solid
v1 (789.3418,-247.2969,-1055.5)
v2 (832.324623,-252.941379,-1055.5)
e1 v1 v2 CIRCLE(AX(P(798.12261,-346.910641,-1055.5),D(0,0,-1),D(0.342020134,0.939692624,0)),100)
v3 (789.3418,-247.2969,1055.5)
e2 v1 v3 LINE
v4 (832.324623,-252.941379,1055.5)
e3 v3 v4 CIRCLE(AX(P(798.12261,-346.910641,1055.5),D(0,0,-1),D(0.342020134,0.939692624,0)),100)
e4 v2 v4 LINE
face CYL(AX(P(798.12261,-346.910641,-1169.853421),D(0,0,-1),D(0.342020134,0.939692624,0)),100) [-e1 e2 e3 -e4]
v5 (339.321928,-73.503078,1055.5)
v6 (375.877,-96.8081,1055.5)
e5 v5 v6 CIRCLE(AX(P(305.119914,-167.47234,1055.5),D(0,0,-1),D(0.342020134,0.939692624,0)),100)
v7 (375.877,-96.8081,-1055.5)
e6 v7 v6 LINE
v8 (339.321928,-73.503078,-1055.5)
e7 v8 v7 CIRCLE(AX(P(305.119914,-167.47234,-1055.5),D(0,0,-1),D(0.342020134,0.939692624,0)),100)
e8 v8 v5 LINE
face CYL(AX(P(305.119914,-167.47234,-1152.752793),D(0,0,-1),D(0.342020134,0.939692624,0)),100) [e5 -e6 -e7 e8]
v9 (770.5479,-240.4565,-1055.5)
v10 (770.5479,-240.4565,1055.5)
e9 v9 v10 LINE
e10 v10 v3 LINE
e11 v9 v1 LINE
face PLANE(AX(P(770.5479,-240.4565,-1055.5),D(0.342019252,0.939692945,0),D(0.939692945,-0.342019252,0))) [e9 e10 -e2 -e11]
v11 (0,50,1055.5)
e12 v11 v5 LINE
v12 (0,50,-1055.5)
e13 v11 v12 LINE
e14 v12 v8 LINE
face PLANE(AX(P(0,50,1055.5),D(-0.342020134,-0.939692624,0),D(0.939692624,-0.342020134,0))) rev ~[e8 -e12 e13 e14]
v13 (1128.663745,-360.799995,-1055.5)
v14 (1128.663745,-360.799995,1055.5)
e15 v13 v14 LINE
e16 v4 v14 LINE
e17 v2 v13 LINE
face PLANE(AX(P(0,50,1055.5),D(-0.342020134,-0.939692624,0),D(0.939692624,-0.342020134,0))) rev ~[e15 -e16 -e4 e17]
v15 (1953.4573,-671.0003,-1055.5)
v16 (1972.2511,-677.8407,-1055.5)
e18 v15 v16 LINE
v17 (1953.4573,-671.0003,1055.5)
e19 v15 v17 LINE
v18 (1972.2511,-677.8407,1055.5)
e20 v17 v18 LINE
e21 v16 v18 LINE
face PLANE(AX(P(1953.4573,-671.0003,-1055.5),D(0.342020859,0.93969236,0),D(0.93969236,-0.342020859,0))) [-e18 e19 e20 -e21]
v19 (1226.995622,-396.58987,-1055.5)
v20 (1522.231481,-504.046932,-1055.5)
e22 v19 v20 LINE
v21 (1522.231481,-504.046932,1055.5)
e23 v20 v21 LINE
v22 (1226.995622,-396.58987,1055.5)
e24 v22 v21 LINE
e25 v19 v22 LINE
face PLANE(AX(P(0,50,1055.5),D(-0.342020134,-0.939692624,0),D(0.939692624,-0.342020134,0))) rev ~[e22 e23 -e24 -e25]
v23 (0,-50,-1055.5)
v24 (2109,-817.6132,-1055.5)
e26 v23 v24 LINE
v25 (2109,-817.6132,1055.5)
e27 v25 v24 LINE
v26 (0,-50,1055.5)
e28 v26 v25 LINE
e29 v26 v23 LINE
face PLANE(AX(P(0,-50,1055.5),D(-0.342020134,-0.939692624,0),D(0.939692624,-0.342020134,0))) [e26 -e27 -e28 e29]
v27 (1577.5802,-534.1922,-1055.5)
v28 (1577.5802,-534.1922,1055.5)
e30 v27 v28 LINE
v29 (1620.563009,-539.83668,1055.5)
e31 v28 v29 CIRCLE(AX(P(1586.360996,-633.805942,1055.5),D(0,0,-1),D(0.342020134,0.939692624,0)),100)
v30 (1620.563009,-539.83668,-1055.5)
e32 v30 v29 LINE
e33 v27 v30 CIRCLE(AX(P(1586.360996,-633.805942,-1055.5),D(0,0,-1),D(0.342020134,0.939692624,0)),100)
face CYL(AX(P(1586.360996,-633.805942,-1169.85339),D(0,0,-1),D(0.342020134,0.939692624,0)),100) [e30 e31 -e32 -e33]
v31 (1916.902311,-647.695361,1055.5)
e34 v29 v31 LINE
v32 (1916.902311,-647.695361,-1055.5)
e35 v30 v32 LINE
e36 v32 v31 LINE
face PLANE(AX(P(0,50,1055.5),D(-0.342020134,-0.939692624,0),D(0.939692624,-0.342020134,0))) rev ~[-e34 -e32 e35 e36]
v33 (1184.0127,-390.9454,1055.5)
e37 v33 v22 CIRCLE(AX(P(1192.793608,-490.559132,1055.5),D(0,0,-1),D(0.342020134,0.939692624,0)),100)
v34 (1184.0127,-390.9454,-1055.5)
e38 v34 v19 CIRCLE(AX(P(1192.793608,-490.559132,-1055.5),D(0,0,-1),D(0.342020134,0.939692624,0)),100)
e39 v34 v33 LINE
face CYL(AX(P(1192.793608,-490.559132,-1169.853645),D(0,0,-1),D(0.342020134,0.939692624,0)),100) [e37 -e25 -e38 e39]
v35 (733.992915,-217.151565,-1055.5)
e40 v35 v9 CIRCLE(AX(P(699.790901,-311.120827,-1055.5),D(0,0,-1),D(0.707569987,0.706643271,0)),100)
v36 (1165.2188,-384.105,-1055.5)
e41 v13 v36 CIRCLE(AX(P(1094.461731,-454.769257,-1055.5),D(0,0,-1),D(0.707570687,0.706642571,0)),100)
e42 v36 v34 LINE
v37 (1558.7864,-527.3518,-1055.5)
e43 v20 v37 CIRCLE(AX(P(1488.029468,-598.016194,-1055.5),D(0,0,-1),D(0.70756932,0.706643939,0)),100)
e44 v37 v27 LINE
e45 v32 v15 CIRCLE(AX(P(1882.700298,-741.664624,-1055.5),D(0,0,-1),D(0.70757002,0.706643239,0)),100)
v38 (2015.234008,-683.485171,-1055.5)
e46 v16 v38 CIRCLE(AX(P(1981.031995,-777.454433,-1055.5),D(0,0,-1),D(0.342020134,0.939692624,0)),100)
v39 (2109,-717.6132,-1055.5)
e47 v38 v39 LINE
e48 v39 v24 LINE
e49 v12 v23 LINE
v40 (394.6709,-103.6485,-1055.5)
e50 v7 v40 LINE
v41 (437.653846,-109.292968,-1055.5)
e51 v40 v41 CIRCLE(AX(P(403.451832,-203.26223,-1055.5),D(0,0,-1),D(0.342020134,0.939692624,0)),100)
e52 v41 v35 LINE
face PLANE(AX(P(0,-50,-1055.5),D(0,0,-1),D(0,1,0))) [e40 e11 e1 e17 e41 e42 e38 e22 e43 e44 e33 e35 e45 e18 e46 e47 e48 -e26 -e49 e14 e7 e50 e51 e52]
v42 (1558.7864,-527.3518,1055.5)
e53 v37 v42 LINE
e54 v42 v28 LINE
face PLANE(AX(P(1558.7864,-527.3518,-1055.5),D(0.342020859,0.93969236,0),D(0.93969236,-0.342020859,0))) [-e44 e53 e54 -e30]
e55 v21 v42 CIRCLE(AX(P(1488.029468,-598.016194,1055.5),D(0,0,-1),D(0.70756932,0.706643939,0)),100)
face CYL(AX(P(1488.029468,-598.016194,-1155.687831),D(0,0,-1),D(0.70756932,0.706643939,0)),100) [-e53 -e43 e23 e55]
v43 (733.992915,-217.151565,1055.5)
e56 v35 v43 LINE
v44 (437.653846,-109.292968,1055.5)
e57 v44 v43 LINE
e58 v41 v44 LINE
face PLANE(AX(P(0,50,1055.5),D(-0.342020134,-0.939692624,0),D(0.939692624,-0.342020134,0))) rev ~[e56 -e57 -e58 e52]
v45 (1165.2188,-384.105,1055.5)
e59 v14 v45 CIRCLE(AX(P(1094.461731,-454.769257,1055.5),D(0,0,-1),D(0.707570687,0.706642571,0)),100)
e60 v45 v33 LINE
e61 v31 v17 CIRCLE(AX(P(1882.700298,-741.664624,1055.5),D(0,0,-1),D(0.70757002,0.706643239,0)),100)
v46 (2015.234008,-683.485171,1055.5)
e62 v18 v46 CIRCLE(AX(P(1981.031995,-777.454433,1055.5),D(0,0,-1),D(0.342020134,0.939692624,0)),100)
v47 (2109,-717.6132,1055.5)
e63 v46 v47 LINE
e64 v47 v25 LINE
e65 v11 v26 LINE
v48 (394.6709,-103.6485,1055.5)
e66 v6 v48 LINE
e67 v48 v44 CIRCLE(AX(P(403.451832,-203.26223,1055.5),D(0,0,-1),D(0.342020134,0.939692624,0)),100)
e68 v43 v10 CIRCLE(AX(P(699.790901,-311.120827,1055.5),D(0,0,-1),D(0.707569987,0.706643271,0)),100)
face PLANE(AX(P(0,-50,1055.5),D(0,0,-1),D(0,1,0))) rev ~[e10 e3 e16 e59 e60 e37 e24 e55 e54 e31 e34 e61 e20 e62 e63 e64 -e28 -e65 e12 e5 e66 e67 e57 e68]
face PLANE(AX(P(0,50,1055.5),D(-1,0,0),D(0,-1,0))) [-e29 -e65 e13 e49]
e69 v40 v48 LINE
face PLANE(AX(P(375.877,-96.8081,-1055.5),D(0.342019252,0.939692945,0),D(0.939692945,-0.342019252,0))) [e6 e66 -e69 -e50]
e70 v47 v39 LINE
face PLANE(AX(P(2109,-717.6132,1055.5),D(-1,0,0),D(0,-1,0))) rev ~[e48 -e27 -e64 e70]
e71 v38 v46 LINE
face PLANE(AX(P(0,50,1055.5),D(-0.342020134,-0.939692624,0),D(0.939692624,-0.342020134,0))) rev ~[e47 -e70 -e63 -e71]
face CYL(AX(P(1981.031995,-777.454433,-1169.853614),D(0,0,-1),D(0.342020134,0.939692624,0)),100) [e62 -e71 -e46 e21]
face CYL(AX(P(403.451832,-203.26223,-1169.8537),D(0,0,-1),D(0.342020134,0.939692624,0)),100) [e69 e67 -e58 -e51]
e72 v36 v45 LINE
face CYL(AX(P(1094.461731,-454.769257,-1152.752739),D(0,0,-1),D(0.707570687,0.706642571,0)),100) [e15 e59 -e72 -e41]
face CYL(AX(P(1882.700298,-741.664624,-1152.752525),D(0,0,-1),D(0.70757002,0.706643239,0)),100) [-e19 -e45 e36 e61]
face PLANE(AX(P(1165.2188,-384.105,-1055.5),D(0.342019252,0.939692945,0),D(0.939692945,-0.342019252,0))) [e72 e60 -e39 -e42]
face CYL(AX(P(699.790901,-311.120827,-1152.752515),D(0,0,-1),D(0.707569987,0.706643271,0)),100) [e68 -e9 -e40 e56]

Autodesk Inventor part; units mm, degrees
ref_plane "XZ Plane" through (0, 0, 0) normal (0, 1, 0) x (-1, 0, 0)
sketch "Sketch1" plane through (0, 0, 0) normal (1, 0, 0) x (0, 1, 0)
  line L0 (-50, 1055.5) -> (50, 1055.5)
  line L1 (50, 1055.5) -> (50, -1055.5)
  line L2 (50, -1055.5) -> (-50, -1055.5)
  line L3 (-50, -1055.5) -> (-50, 1055.5)
  line L4 (-50, 1055.5) -> (50, -1055.5) construction
  line L5 (50, 1055.5) -> (-50, -1055.5) construction
  point P0 (0, 0)
  dimension "d0" = 100
  dimension "d1" = 2111
ref_plane "Work Plane2" through (2109, 0, 0) normal (1, 0, 0) x (0, 1, 0)
ref_plane "Work Plane1" through (0, 0, 0) normal (1, 0, 0) x (0, 1, 0)
sketch "Sketch3" plane through (2109, 0, 0) normal (1, 0, 0) x (0, 1, 0)
  line L0 (-50, 1055.5) -> (50, 1055.5) projected
  point P0 (0, 0)
ref_plane "Work Plane3" through (0, -50, 1055.5) normal (0, 0, -1) x (0, 1, 0)
sketch "Sketch4" plane through (0, -50, 1055.5) normal (0, 0, -1) x (0, 1, 0)
  line L0 (0, 2109) -> (100, 2109) projected
  line L1 (100, 0) -> (-667.6132, 2109)
  line L2 (100, 0) -> (2344.3509, 0) construction
  line L3 (0, 0) -> (-767.6132, 2109)
  line L4 (0, 0) -> (2244.3509, 0) construction
  line L5 (-667.6132, 2109) -> (-767.6132, 2109)
  line L6 (100, 0) -> (0, 0)
  point P0 (50, 0)
  dimension "d4" = 110
  dimension "d5" = 110
extrude "Extrusion1" add sketch "Sketch4" along normal blind 2111
sketch "Sketch5" plane through (0, -50, -1055.5) normal (0, 0, -1) x (-1, 0, 0)
  line L0 (0, 100) -> (-2109, -667.6132) projected
  line L1 (0, 100) -> (-375.877, -36.8081)
  line L2 (-375.877, -36.8081) -> (-375.877, -46.8081)
  line L3 (-375.877, -46.8081) -> (-394.6709, -53.6485)
  line L4 (-394.6709, -53.6485) -> (-394.6709, -43.6485)
  line L5 (-394.6709, -43.6485) -> (-770.5479, -180.4565)
  line L6 (-770.5479, -180.4565) -> (-770.5479, -190.4565)
  line L7 (-770.5479, -190.4565) -> (-789.3418, -197.2969)
  line L8 (-789.3418, -197.2969) -> (-789.3418, -187.2969)
  line L9 (-789.3418, -187.2969) -> (-1165.2188, -324.105)
  line L10 (-1165.2188, -324.105) -> (-1165.2188, -334.105)
  line L11 (-1165.2188, -334.105) -> (-1184.0127, -340.9454)
  line L12 (-1184.0127, -340.9454) -> (-1184.0127, -330.9454)
  line L13 (-1184.0127, -330.9454) -> (-1559.8898, -467.7534)
  line L14 (-1559.8898, -467.7534) -> (-1558.7864, -477.3518)
  line L15 (-1558.7864, -477.3518) -> (-1577.5802, -484.1922)
  line L16 (-1577.5802, -484.1922) -> (-1577.5802, -474.1922)
  line L17 (-1577.5802, -474.1922) -> (-1953.4573, -611.0003)
  line L18 (-1953.4573, -611.0003) -> (-1953.4573, -621.0003)
  line L19 (-1953.4573, -621.0003) -> (-1972.2511, -627.8407)
  line L20 (-1972.2511, -627.8407) -> (-1972.2511, -617.8407)
  line L21 (-1972.2511, -617.8407) -> (-375.877, -36.8081)
  point P0 (0, 50)
  dimension "d8" = 400
  dimension "d9" = 10
  dimension "d10" = 20
  dimension "d11" = 400
  dimension "d12" = 20
  dimension "d13" = 400
  dimension "d14" = 20
  dimension "d15" = 400
  dimension "d16" = 20
  dimension "d17" = 400
  dimension "d18" = 20
extrude "Extrusion2" cut sketch "Sketch5" against normal through all
fillet "Fillet1" radius 100 10 edges at (1972.2511, -667.8407, 0) (1953.4573, -661.0003, 0) (1577.5802, -524.1922, 0) (1559.8898, -517.7534, 0) (1184.0127, -380.9454, 0) (1165.2188, -374.105, 0) (789.3418, -237.2969, 0) (770.5479, -230.4565, 0) (394.6709, -93.6485, 0) (375.877, -86.8081, 0)
properties part number "side_curve_panel_01" material "Wood (Maple)"
